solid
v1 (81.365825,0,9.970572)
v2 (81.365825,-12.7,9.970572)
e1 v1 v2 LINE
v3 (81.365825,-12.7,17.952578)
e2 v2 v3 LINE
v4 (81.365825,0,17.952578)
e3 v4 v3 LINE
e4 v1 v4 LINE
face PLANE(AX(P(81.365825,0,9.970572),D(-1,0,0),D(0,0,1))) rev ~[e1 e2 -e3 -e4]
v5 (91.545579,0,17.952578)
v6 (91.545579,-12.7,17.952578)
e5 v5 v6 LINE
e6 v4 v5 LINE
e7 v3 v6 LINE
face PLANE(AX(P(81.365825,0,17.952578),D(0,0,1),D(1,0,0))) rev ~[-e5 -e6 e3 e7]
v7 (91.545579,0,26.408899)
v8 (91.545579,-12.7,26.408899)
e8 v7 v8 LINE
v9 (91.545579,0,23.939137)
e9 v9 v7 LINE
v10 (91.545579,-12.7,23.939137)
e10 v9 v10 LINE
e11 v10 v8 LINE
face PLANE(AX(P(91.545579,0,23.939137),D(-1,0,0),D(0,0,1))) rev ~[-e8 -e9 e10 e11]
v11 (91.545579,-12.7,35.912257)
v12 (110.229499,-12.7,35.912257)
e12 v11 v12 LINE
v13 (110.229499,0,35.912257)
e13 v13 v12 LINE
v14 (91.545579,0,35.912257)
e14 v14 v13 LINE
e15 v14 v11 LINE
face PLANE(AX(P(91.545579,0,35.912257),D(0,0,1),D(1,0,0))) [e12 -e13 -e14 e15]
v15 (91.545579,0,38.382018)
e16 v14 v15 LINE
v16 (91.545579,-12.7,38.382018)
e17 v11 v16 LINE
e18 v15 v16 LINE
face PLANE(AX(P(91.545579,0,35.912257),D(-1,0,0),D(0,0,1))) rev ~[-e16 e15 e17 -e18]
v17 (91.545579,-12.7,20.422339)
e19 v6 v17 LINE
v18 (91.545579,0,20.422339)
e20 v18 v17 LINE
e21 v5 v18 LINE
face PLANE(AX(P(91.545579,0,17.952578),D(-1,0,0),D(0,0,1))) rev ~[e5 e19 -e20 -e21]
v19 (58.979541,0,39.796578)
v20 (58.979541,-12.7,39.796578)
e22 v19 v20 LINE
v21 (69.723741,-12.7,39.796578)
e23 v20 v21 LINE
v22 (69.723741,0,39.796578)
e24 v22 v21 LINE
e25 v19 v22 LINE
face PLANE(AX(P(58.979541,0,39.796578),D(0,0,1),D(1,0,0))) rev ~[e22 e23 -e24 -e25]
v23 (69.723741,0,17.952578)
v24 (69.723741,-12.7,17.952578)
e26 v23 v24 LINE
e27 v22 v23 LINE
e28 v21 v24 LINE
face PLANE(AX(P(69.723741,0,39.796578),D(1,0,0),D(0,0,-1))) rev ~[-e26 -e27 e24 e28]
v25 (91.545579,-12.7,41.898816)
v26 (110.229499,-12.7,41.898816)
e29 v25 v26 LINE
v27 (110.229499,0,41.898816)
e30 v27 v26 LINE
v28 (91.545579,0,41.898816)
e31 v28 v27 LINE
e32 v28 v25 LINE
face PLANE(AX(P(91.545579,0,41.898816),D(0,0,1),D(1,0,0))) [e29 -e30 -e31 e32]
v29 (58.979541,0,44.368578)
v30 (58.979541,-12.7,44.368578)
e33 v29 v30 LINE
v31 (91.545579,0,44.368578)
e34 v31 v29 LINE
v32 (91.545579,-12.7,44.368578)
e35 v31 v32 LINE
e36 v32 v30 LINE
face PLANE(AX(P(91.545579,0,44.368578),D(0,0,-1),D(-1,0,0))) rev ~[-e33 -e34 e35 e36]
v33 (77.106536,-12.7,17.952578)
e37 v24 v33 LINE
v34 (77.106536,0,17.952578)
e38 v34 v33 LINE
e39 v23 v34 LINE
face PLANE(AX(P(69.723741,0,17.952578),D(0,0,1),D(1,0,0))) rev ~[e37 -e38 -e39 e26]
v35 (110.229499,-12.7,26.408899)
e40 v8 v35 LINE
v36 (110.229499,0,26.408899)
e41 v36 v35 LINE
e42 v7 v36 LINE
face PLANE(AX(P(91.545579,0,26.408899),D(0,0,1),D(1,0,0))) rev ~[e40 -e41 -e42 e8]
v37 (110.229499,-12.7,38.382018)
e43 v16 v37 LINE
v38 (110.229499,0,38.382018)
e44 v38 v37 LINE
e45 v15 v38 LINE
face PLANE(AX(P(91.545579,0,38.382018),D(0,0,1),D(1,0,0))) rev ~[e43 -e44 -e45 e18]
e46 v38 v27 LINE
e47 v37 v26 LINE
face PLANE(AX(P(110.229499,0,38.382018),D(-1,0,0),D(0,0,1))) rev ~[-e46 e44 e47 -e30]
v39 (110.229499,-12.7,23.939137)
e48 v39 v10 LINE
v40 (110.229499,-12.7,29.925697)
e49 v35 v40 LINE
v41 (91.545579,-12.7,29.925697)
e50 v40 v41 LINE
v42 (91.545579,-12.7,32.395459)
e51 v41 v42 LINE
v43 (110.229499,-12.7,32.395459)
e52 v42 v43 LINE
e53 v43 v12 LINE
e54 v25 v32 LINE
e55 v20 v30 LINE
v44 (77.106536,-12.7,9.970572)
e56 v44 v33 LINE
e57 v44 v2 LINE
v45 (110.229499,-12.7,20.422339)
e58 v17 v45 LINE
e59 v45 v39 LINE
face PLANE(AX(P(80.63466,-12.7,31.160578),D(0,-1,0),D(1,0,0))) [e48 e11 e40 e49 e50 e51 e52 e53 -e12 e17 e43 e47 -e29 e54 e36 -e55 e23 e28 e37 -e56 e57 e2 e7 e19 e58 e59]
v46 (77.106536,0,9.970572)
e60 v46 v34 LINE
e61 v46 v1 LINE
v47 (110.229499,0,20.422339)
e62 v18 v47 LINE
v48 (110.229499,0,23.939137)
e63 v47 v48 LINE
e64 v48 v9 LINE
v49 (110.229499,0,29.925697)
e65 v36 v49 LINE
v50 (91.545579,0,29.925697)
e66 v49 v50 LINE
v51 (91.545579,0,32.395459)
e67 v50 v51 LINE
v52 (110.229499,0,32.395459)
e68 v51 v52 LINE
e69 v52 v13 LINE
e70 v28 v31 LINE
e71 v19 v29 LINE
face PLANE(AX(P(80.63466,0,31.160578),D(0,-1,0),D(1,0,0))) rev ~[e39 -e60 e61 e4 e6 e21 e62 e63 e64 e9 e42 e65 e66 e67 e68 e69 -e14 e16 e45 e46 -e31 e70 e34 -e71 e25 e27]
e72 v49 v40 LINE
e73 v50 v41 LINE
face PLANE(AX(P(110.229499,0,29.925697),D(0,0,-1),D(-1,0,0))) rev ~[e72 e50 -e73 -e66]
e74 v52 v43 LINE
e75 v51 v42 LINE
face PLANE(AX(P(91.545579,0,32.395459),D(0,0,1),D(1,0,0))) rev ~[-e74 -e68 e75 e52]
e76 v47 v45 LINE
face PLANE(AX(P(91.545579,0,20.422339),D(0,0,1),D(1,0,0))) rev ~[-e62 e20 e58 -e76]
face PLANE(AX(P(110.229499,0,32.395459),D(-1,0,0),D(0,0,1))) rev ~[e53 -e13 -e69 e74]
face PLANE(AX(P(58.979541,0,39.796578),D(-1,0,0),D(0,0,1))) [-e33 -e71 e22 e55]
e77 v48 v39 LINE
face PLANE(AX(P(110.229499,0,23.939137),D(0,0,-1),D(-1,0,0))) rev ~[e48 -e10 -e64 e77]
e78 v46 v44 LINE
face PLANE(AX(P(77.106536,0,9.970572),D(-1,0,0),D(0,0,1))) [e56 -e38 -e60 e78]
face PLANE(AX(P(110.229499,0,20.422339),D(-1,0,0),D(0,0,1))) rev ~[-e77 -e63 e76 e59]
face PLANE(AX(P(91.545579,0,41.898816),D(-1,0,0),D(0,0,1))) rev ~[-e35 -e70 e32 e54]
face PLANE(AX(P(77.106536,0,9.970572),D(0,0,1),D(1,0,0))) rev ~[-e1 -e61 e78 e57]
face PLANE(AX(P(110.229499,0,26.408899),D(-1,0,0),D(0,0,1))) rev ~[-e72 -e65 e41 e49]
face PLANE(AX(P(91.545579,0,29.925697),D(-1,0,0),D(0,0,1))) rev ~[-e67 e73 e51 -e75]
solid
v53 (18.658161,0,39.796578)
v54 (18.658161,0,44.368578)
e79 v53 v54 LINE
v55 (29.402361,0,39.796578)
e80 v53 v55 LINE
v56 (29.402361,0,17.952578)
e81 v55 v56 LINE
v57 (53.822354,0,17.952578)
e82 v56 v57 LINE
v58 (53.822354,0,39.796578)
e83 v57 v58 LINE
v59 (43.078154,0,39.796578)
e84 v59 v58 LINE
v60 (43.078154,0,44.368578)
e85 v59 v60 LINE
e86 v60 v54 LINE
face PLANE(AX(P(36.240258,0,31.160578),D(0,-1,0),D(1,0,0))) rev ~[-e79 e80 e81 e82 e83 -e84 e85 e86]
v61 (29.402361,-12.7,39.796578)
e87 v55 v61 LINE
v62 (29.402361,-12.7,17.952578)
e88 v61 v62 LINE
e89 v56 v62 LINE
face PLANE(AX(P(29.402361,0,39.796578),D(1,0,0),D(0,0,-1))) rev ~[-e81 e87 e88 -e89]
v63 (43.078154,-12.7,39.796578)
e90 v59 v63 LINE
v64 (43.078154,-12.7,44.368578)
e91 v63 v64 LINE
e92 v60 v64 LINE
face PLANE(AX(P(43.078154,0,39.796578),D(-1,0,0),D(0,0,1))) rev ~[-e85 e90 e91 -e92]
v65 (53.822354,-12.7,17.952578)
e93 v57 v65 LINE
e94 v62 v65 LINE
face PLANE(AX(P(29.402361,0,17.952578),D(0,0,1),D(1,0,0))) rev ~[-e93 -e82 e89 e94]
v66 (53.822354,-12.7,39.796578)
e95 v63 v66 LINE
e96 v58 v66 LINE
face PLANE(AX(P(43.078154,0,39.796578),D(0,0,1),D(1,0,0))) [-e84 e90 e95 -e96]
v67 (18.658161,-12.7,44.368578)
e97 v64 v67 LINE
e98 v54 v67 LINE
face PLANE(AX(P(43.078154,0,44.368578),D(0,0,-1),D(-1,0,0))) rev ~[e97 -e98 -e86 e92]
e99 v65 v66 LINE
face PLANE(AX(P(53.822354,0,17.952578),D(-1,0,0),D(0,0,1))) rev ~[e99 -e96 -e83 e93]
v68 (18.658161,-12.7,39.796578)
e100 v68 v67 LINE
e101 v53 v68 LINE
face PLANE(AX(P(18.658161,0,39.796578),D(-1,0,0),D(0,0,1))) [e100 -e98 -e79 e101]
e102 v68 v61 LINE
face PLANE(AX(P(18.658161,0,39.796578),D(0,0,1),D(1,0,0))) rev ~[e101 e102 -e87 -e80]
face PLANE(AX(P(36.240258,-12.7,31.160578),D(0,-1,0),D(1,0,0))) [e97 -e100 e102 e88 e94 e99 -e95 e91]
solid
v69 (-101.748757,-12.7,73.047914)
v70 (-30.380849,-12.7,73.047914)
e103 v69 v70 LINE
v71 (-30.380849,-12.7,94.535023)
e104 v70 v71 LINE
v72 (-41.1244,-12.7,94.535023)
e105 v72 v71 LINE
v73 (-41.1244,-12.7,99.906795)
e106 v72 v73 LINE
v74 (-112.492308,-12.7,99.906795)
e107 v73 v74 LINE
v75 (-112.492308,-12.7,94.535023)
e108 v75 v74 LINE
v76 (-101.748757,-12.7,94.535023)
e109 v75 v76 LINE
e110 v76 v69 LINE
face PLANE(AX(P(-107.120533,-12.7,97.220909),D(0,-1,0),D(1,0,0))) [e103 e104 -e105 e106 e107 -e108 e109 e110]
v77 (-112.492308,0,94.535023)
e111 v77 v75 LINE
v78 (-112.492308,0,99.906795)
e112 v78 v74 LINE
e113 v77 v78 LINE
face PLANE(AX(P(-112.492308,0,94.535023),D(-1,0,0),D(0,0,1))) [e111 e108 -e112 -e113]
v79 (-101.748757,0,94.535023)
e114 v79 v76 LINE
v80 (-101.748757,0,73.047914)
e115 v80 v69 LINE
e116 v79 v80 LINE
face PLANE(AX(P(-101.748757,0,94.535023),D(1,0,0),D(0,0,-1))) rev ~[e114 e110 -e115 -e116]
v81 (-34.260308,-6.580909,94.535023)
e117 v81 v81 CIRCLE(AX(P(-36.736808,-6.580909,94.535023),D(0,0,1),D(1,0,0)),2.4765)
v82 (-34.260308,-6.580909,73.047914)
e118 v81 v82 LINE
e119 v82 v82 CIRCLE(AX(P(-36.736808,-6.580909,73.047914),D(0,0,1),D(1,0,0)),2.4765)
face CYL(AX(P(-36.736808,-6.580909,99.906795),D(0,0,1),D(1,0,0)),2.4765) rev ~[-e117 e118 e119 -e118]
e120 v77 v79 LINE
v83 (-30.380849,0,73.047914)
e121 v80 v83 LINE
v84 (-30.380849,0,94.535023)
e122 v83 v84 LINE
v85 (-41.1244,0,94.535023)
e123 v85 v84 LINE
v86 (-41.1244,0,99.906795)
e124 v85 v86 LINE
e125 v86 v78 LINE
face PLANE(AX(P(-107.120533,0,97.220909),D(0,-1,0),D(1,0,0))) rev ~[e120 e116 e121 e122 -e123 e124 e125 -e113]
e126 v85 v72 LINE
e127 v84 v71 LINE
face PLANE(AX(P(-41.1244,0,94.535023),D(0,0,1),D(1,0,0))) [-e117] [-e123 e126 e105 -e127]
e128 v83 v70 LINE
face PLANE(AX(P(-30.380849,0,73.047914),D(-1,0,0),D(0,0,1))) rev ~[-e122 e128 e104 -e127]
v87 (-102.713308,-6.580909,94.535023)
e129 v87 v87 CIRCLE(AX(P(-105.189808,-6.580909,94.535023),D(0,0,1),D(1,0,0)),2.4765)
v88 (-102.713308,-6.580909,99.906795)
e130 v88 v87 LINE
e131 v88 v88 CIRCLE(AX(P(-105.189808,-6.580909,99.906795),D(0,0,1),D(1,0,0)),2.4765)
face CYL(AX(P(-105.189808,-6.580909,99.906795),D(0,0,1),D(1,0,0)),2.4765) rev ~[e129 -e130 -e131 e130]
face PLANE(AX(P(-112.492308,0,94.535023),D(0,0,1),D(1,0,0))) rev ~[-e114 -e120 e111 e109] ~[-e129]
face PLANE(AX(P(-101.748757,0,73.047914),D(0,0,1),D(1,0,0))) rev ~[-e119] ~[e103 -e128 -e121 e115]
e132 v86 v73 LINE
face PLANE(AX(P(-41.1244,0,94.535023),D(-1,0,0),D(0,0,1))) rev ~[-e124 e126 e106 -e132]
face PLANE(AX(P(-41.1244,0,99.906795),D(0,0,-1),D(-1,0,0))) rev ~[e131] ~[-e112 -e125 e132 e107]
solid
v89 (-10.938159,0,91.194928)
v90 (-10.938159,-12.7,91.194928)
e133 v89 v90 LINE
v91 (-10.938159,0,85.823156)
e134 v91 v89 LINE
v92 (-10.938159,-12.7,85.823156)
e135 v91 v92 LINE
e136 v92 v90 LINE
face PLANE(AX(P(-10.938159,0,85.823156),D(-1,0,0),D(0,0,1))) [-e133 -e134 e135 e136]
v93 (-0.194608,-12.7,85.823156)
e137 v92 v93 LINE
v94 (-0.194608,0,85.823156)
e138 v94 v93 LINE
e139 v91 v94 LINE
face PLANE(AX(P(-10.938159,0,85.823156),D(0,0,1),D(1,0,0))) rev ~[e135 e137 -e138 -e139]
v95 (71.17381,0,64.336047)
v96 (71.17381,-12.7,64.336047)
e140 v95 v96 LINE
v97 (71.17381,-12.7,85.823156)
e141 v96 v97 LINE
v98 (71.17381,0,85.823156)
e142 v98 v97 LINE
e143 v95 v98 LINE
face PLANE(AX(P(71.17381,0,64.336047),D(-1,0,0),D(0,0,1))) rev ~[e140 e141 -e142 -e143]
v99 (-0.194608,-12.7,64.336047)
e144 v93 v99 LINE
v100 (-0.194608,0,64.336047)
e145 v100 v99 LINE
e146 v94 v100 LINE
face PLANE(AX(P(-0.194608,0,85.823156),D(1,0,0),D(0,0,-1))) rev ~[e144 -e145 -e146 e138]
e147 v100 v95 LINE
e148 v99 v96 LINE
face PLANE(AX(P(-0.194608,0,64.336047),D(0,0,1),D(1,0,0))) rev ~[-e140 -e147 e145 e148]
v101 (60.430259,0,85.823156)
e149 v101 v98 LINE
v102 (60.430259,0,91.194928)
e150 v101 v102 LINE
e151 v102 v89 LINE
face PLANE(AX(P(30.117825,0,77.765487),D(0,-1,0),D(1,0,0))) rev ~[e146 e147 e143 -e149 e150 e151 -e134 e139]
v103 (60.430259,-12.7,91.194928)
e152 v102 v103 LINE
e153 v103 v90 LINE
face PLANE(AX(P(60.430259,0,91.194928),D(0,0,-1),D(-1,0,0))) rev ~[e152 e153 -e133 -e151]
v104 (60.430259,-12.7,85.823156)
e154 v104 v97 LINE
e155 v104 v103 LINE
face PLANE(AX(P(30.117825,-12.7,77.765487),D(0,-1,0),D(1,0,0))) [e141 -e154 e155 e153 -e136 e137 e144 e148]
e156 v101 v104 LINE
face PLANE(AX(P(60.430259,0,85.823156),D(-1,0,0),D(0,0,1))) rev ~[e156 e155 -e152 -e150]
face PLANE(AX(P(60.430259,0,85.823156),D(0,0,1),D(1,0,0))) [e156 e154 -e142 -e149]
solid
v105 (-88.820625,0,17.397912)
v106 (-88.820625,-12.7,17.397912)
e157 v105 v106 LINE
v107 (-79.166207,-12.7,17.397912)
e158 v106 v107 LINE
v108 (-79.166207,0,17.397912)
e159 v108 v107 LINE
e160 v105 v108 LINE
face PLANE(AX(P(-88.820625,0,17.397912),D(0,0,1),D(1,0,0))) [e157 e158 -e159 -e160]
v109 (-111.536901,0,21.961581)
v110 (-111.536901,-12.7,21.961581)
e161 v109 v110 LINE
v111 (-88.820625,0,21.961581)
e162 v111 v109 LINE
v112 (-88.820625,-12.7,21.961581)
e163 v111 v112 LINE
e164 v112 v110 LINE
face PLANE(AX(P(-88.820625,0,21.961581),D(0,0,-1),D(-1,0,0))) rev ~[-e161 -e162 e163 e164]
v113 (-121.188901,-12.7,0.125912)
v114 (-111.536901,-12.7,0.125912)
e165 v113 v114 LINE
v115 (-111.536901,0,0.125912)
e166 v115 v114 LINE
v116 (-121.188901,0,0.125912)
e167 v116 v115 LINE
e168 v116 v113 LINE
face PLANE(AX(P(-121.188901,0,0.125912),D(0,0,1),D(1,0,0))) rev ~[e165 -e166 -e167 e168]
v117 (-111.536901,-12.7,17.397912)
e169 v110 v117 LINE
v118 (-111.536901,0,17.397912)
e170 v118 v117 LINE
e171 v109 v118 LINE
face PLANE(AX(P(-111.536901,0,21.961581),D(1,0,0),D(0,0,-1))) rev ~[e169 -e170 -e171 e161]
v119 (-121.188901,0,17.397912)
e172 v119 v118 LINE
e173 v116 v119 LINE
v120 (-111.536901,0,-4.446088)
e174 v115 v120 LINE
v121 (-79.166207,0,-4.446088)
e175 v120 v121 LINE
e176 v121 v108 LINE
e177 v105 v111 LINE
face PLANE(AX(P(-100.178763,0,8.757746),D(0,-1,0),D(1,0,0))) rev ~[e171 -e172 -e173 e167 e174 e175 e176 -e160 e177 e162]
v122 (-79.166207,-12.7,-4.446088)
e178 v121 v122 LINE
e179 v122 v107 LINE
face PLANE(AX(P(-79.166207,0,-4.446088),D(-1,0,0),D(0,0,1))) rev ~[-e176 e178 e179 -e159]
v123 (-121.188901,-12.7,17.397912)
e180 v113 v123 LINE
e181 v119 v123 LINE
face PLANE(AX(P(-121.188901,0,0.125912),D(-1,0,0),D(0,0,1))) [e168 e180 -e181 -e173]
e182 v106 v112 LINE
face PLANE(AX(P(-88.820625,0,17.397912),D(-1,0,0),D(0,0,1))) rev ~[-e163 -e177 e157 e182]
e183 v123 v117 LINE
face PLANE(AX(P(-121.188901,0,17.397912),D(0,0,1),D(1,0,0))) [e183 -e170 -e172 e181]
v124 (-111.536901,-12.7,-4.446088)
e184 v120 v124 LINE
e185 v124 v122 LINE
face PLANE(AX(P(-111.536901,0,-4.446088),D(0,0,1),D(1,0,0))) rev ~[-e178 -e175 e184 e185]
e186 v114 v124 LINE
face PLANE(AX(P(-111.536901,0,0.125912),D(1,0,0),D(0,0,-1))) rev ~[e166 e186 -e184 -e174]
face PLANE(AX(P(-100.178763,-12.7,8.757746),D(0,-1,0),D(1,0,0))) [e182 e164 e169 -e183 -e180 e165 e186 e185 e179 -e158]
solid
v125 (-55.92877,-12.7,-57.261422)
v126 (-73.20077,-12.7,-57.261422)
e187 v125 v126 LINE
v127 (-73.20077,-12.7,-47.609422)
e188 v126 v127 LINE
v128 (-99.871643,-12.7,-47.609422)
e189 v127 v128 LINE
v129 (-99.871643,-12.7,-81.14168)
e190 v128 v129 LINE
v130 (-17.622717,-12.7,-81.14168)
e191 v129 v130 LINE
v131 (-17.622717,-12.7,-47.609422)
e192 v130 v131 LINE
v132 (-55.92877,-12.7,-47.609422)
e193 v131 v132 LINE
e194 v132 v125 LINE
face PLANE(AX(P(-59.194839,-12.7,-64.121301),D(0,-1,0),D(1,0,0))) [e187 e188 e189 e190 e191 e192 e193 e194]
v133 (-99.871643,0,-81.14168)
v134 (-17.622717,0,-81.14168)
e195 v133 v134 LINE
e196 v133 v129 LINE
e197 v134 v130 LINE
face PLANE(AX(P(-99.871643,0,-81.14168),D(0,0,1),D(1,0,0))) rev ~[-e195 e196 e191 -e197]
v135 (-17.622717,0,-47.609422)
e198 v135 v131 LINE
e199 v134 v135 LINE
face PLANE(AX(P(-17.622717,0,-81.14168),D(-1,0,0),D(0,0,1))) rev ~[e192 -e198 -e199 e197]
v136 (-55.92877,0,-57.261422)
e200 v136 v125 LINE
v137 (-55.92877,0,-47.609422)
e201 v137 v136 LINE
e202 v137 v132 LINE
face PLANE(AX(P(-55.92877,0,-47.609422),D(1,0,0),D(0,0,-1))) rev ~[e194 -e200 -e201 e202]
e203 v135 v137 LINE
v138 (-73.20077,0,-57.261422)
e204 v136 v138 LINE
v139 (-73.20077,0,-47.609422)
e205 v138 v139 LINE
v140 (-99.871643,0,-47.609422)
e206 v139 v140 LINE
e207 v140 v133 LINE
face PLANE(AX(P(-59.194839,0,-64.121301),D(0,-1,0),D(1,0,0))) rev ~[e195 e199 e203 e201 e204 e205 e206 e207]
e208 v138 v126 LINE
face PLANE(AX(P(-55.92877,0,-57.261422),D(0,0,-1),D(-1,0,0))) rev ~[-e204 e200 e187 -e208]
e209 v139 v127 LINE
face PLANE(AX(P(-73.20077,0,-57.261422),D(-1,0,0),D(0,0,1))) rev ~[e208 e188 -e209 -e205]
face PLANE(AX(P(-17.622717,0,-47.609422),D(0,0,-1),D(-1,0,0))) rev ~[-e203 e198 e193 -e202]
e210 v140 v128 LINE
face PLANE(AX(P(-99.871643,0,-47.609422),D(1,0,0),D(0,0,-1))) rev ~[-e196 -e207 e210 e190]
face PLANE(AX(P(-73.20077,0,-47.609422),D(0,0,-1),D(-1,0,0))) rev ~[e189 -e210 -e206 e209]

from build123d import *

# Parameters (mm, degrees)
F0_W     = 10.7435509562
F0_H     = 5.3717717528
F0_H_2   = 17.2664299607
F0_H_3   = 4.2206794024
F1_DEPTH = 12.7
F2_DEPTH = 12.7
F0_W_2   = 9.654417634
F0_H_4   = 17.272
F0_W_3   = 9.652
F0_H_5   = 4.572
F3_DEPTH = 12.7
F4_DEPTH = 12.7
F5_R     = 2.4765
F6_DEPTH = 181.0494751265
F0_W_4   = 10.7442
F7_DEPTH = 12.7
F0_W_5   = 4.259288311
F0_H_6   = 7.9820062965
F0_W_6   = 18.6839207555
F0_H_7   = 3.5167981537
F8_DEPTH = 12.7


# Not quite as in the source:
# - a feature names something its author has since deleted; it is built from what else it names


with BuildPart() as f1:
    # F0 (on Front) → F1 (new body)
    with BuildSketch(Plane.XZ):
        Polygon((60.4302587326, 91.194928045), (-0.1946078347, 91.194928045), (-0.1946078347, 85.8231562922), (-0.1946078347, 68.5567263315), (-0.1946078347, 64.3360469291), (60.4302587326, 64.3360469291), (60.4302587326, 68.5567263315), (60.4302587326, 85.8231562922), align=None)
        with Locations((-5.5663833129, 88.5090421686)):
            Rectangle(F0_W, F0_H)
        with Locations((65.8020342107, 77.1899413118)):
            Rectangle(F0_W, F0_H_2)
        with Locations((65.8020342107, 66.4463866303)):
            Rectangle(F0_W, F0_H_3)
    extrude(amount=F1_DEPTH)


with BuildPart() as f2:
    # F0 (on Front) → F2 (new body)
    with BuildSketch(Plane.XZ):
        Polygon((-73.2007697225, -47.6094222765), (-99.8716428876, -47.6094222765), (-99.8716428876, -81.1416803997), (-17.6227167249, -81.1416803997), (-17.6227167249, -47.6094222765), (-55.9287697225, -47.6094222765), (-55.9287697225, -57.2614222765), (-73.2007697225, -57.2614222765), align=None)
    extrude(amount=F2_DEPTH)


with BuildPart() as f3:
    # F0 (on Front) → F3 (new body)
    with BuildSketch(Plane.XZ):
        Polygon((-88.8206250172, 21.9615809619), (-111.5369013648, 21.9615809619), (-111.5369013648, 17.3979116636), (-111.5369013648, 0.1259116636), (-111.5369013648, -4.4460883364), (-88.8206250172, -4.4460883364), (-88.8206250172, 0.1259116636), (-88.8206250172, 17.3979116636), align=None)
        with Locations((-83.9934162002, 8.7619116636)):
            Rectangle(F0_W_2, F0_H_4)
        with Locations((-116.3629013648, 8.7619116636)):
            Rectangle(F0_W_3, F0_H_4)
        with Locations((-83.9934162002, -2.1600883364)):
            Rectangle(F0_W_2, F0_H_5)
    extrude(amount=F3_DEPTH)


with BuildPart() as f4:
    # F0 (on Front) → F4 (new body)
    with BuildSketch(Plane.XZ):
        with Locations((-107.1205325425, 97.2209088504)):
            Rectangle(F0_W, F0_H)
        Polygon((-41.1243997514, 99.9067947268), (-101.7487570643, 99.9067947268), (-101.7487570643, 94.535022974), (-101.7487570643, 77.2685930133), (-101.7487570643, 73.0479136109), (-41.1243997514, 73.0479136109), (-41.1243997514, 77.2685930133), (-41.1243997514, 94.535022974), align=None)
        with Locations((-35.7526242733, 85.9018079937)):
            Rectangle(F0_W, F0_H_2)
        with Locations((-35.7526242733, 75.1582533121)):
            Rectangle(F0_W, F0_H_3)
    extrude(amount=F4_DEPTH)

    # F5 (on face) → F6 (cut, through all)
    with BuildSketch(Plane.XY.offset(99.9067947268)):
        with Locations((-105.1898080206, -6.5809087828)):
            Circle(F5_R)
        with Locations((-36.7368080206, -6.5809087828)):
            Circle(F5_R)
    extrude(amount=-F6_DEPTH, mode=Mode.SUBTRACT)


with BuildPart() as f7:
    # F0 (on Front) → F7 (new body)
    with BuildSketch(Plane.XZ):
        Polygon((43.0781543255, 44.3685778238), (29.4023611633, 44.3685778238), (29.4023611633, 39.7965778238), (29.4023611633, 22.5245778238), (29.4023611633, 17.9525778238), (43.0781543255, 17.9525778238), (43.0781543255, 22.5245778238), (43.0781543255, 39.7965778238), align=None)
        with Locations((24.0302611633, 42.0825778238)):
            Rectangle(F0_W_4, F0_H_5)
        with Locations((48.4502543255, 31.1605778238)):
            Rectangle(F0_W_4, F0_H_4)
        with Locations((48.4502543255, 20.2385778238)):
            Rectangle(F0_W_4, F0_H_5)
    extrude(amount=F7_DEPTH)


with BuildPart() as f8:
    # F0 (on Front) → F8 (new body)
    with BuildSketch(Plane.XZ):
        Polygon((69.7237410633, 44.3685778238), (69.7237410633, 39.7965778238), (69.7237410633, 22.5245778238), (69.7237410633, 17.9525778238), (77.106536278, 17.9525778238), (81.365824589, 17.9525778238), (91.5455787269, 17.9525778238), (91.5455787269, 19.9959375066), (91.5455787269, 20.4223393008), (91.5455787269, 23.6873332513), (91.5455787269, 23.9391374546), (91.5455787269, 26.4088989316), (91.5455787269, 28.5145420683), (91.5455787269, 29.9256970853), (91.5455787269, 32.205937813), (91.5455787269, 32.3954585623), (91.5455787269, 35.9122567161), (91.5455787269, 38.106836158), (91.5455787269, 38.3820181931), (91.5455787269, 41.8988163468), (91.5455787269, 44.3685778238), align=None)
        with Locations((79.2361804335, 13.9615746756)):
            Rectangle(F0_W_5, F0_H_6)
        with Locations((100.8875391047, 40.14041727)):
            Rectangle(F0_W_6, F0_H_7)
        with Locations((100.8875391047, 34.1538576392)):
            Rectangle(F0_W_6, F0_H_7)
        Polygon((110.2294994825, 29.9256970853), (91.5455787269, 29.9256970853), (91.5455787269, 28.5145420683), (91.5455787269, 26.4088989316), (110.2294994825, 26.4088989316), align=None)
        Polygon((91.5455787269, 23.6873332513), (91.5455787269, 20.4223393008), (110.2294994825, 20.4223393008), (110.2294994825, 23.9391374546), (91.5455787269, 23.9391374546), align=None)
        with Locations((64.3516410633, 42.0825778238)):
            Rectangle(F0_W_4, F0_H_5)
    extrude(amount=F8_DEPTH)


solid = Compound([f1.part, f2.part, f3.part, f4.part, f7.part, f8.part])
